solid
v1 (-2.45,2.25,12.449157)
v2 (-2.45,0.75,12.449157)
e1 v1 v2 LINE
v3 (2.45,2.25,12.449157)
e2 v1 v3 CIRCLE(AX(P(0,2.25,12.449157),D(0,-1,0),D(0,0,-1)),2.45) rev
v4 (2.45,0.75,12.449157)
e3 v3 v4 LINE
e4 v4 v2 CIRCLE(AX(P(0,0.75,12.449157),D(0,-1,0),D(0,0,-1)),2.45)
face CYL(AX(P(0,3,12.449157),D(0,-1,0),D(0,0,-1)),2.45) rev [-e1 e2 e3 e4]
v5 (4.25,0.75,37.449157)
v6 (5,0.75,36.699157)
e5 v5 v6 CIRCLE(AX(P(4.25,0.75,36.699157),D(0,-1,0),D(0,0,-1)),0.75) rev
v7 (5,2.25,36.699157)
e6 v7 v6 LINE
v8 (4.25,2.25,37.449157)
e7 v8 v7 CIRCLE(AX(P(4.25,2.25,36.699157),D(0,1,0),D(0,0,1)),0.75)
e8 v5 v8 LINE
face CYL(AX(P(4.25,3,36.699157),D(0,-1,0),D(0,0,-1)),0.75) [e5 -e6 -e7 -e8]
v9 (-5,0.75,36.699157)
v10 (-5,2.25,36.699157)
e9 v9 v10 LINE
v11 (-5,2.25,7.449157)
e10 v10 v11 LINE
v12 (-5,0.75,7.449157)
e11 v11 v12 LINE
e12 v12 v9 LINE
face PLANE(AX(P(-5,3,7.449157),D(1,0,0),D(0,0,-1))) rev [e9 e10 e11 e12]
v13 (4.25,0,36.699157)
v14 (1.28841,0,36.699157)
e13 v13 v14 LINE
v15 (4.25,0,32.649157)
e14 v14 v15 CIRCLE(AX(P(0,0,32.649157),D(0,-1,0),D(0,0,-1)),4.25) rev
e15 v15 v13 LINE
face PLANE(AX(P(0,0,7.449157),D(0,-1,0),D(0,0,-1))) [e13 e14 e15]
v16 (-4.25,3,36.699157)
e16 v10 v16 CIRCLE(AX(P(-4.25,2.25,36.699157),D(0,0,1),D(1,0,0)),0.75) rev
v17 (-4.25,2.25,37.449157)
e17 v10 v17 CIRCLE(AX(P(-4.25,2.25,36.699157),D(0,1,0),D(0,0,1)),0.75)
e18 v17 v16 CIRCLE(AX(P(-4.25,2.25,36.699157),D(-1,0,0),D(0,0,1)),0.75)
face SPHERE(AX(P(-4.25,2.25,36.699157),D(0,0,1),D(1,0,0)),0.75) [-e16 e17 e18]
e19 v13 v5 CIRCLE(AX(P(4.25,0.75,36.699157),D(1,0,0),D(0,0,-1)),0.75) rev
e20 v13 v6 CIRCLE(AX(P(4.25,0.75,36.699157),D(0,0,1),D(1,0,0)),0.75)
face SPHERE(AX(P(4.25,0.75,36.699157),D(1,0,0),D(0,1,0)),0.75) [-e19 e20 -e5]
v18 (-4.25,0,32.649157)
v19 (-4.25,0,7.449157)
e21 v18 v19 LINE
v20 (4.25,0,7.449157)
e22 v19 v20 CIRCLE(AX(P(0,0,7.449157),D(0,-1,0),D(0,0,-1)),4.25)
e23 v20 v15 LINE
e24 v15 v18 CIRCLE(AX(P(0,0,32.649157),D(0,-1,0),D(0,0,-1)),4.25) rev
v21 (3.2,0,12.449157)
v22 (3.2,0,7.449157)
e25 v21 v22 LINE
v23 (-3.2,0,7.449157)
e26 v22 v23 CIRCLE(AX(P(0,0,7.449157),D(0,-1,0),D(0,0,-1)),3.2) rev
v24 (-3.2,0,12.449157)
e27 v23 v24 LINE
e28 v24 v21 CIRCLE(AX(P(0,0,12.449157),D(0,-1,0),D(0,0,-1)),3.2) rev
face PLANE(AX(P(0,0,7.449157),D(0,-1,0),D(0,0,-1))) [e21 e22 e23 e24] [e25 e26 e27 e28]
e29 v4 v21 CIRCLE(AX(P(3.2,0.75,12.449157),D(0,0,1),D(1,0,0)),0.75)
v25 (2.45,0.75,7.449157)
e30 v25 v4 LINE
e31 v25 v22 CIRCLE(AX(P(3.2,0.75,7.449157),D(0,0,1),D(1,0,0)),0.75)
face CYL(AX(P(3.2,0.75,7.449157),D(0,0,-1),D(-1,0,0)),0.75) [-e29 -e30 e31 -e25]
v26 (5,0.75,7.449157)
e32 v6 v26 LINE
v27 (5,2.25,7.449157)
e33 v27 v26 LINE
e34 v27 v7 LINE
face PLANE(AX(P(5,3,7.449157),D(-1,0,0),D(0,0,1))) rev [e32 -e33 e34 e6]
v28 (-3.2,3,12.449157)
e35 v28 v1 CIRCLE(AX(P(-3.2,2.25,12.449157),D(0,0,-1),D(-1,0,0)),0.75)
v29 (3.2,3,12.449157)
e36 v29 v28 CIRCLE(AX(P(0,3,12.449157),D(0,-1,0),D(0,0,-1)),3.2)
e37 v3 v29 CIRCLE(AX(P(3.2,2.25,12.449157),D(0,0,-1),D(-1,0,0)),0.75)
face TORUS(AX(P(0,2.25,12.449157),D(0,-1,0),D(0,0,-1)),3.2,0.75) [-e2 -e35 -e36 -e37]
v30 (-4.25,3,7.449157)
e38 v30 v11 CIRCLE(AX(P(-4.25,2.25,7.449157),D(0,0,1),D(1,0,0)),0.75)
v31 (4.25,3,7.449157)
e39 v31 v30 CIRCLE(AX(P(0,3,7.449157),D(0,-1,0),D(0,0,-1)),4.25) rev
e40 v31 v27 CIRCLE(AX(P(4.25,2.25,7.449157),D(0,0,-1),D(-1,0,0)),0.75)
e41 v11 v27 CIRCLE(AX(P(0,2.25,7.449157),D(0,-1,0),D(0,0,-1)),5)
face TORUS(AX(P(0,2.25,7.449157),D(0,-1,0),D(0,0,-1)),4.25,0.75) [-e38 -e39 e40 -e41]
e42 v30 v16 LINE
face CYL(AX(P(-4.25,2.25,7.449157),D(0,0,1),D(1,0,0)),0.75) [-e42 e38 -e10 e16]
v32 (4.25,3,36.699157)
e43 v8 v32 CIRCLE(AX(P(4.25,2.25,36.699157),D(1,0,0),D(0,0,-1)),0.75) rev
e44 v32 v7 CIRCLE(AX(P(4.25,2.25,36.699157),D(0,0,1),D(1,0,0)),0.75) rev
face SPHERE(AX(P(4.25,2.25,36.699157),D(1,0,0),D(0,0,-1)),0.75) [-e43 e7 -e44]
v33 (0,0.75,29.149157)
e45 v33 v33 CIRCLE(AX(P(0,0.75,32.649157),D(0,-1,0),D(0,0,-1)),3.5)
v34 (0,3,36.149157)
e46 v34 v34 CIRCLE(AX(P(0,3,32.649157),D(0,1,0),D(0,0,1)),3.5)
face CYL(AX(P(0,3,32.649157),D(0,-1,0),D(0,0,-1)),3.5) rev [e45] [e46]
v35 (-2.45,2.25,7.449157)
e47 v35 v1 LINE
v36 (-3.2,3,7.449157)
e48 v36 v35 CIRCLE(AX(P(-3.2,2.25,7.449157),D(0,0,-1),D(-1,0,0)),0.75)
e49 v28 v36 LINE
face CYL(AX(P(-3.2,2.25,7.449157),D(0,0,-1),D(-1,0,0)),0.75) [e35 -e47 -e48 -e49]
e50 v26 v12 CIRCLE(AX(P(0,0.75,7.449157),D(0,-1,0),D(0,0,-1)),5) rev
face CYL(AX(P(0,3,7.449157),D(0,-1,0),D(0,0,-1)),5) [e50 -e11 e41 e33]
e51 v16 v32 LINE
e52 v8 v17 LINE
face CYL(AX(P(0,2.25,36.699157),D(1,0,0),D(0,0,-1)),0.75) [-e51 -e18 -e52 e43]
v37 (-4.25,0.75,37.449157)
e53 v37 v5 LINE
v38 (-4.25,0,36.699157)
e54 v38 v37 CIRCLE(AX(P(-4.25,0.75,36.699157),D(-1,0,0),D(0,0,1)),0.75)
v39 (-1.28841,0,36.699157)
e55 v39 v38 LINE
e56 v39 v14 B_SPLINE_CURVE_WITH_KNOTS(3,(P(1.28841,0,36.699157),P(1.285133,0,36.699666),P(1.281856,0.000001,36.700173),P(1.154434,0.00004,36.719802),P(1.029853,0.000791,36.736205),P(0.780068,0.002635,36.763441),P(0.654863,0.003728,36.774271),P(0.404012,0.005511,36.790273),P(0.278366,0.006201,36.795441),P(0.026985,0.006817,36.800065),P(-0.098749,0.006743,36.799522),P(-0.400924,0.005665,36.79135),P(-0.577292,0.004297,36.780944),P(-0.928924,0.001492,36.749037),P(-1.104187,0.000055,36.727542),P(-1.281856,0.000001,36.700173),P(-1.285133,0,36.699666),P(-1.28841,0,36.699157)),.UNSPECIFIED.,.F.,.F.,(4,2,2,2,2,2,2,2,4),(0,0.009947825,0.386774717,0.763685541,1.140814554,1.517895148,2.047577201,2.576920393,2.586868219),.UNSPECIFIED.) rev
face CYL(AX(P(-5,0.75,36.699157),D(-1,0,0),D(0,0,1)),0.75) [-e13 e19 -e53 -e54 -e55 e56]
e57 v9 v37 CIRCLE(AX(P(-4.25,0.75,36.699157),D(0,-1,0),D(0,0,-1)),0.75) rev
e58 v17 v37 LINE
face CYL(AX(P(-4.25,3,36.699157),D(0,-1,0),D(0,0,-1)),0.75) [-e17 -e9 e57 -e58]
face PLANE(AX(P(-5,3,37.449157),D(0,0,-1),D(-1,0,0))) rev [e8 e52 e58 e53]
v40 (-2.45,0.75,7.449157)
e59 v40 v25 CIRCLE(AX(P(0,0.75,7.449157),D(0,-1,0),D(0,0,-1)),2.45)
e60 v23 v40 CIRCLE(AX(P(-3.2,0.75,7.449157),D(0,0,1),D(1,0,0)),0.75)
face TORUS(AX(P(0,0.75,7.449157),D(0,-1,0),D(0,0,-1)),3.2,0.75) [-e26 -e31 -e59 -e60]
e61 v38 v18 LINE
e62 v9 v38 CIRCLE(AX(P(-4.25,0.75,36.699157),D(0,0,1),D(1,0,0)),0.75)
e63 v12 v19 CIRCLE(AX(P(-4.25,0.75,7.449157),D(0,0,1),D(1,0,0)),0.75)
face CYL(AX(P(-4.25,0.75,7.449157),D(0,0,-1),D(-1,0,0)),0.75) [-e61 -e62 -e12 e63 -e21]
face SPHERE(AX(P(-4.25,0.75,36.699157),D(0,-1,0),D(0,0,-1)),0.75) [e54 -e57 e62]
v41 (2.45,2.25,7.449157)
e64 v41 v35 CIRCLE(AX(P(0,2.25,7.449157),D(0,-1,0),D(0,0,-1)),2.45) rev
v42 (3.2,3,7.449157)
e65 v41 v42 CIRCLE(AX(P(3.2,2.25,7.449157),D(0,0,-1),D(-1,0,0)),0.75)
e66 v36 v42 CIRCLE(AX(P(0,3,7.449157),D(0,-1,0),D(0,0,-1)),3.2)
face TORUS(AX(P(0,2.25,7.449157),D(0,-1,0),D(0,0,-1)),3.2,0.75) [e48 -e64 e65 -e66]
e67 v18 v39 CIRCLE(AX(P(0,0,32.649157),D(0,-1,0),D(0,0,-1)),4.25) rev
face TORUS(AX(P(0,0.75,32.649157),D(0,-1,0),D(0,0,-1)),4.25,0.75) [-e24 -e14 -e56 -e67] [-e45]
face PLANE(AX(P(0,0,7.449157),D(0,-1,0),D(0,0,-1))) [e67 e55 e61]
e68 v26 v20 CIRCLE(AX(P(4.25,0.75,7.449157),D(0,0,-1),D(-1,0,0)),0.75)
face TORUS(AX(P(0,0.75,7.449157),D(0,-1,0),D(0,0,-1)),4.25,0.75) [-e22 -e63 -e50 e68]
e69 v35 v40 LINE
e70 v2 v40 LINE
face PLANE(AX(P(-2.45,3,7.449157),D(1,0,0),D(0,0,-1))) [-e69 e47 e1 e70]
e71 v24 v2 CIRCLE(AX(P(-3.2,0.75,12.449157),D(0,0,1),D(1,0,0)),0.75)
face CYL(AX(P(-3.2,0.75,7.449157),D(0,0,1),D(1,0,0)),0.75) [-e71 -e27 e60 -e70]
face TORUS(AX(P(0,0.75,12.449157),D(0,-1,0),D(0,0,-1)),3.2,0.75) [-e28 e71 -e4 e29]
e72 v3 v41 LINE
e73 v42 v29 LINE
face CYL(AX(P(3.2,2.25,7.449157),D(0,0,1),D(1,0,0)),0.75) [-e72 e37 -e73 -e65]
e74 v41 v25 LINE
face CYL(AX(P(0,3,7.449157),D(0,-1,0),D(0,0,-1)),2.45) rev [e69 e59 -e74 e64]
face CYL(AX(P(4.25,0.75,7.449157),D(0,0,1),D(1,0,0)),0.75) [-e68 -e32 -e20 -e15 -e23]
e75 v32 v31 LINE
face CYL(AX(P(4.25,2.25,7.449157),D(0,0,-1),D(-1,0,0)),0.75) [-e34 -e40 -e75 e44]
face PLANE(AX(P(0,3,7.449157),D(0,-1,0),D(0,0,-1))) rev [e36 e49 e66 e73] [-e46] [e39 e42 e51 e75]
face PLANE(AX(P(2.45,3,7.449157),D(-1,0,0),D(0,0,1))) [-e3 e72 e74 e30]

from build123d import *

# Parameters (mm, degrees)
SKETCH1_R           = 3.5
BOSS_EXTRUDE1_DEPTH = 3
FILLET1_R           = 0.75


with BuildPart() as part:
    # Sketch1 → Boss-Extrude1 (new body)
    with BuildSketch(Plane(origin=(0, 0, 0), x_dir=(1, 0, 0), z_dir=(0, 1, 0))):
        with BuildLine():
            Line((-5, -37.44915748), (5, -37.44915748))
            Line((5, -37.44915748), (5, -7.44915748))
            ThreePointArc((5, -7.44915748), (0, -2.44915748), (-5, -7.44915748))
            Line((-5, -7.44915748), (-5, -37.44915748))
        make_face()
        with Locations(Location((0, -32.64915748, 0), (0, 0, 270))):
            Circle(SKETCH1_R, mode=Mode.SUBTRACT)
        with BuildLine():
            Line((2.45, -7.44915748), (2.45, -12.44915748))
            ThreePointArc((2.45, -12.44915748), (0, -14.89915748), (-2.45, -12.44915748))
            Line((-2.45, -12.44915748), (-2.45, -7.44915748))
            ThreePointArc((-2.45, -7.44915748), (0, -4.99915748), (2.45, -7.44915748))
        make_face(mode=Mode.SUBTRACT)
    extrude(amount=BOSS_EXTRUDE1_DEPTH)

    # Fillet1
    # the kernel refuses this fillet: 0.75 mm, written as the material it takes off along each edge
    with BuildSketch(Plane(origin=(-4.25, 2.25, 36.69915748), x_dir=(0, 0, 1), z_dir=(-1, 0, 0))) as fillet1_piece_1_section:
        Polygon((0, 0), (FILLET1_R, 0), (FILLET1_R, FILLET1_R), (0, FILLET1_R), align=None)
    fillet1_piece_1 = extrude(amount=FILLET1_R, mode=Mode.PRIVATE)
    fillet1_piece_1 = fillet1_piece_1 - Plane(origin=(-4.25, 2.25, 36.69915748), x_dir=(0, -0.7071067811865475, -0.7071067811865475), z_dir=(-1, 0, 0)) * Sphere(FILLET1_R, mode=Mode.PRIVATE)
    add(fillet1_piece_1, mode=Mode.SUBTRACT)
    with BuildSketch(Plane(origin=(4.25, 2.25, 36.69915748), x_dir=(0, 1, 0), z_dir=(0, 0, 1))) as fillet1_piece_2_section:
        Polygon((0, 0), (FILLET1_R, 0), (FILLET1_R, -FILLET1_R), (0, -FILLET1_R), align=None)
    fillet1_piece_2 = extrude(amount=FILLET1_R, mode=Mode.PRIVATE)
    fillet1_piece_2 = fillet1_piece_2 - Plane(origin=(4.25, 2.25, 36.69915748), x_dir=(-0.7071067811865475, -0.7071067811865475, 0), z_dir=(0, 0, 1)) * Sphere(FILLET1_R, mode=Mode.PRIVATE)
    add(fillet1_piece_2, mode=Mode.SUBTRACT)
    with BuildSketch(Plane(origin=(-4.25, 0.75, 36.69915748), x_dir=(0, 0, 1), z_dir=(-1, 0, 0))) as fillet1_piece_3_section:
        Polygon((0, 0), (FILLET1_R, 0), (FILLET1_R, -FILLET1_R), (0, -FILLET1_R), align=None)
    fillet1_piece_3 = extrude(amount=FILLET1_R, mode=Mode.PRIVATE)
    fillet1_piece_3 = fillet1_piece_3 - Plane(origin=(-4.25, 0.75, 36.69915748), x_dir=(0, 0.7071067811865475, -0.7071067811865475), z_dir=(-1, 0, 0)) * Sphere(FILLET1_R, mode=Mode.PRIVATE)
    add(fillet1_piece_3, mode=Mode.SUBTRACT)
    with BuildSketch(Plane(origin=(4.25, 0.75, 36.69915748), x_dir=(1, 0, 0), z_dir=(0, 0, 1))) as fillet1_piece_4_section:
        Polygon((0, 0), (FILLET1_R, 0), (FILLET1_R, -FILLET1_R), (0, -FILLET1_R), align=None)
    fillet1_piece_4 = extrude(amount=FILLET1_R, mode=Mode.PRIVATE)
    fillet1_piece_4 = fillet1_piece_4 - Plane(origin=(4.25, 0.75, 36.69915748), x_dir=(-0.7071067811865475, 0.7071067811865475, 0), z_dir=(0, 0, 1)) * Sphere(FILLET1_R, mode=Mode.PRIVATE)
    add(fillet1_piece_4, mode=Mode.SUBTRACT)
    with BuildSketch(Plane(origin=(-5, 3, 7.44915748), x_dir=(0, -1, 0), z_dir=(0, 0, 1)), Plane(origin=(5, 3, 36.69915748), x_dir=(0, -1, 0), z_dir=(0, 0, -1))) as fillet1_piece_5:
        with BuildLine():
            CenterArc((FILLET1_R, FILLET1_R), FILLET1_R, 180, 90)
            Line((0, FILLET1_R), (0, 0))
            Line((0, 0), (FILLET1_R, 0))
        make_face()
    extrude(amount=29.25, mode=Mode.SUBTRACT)
    with BuildSketch(Plane(origin=(0, 0, 7.44915748), x_dir=(-1, 0, 0), z_dir=(0, 0, 1))) as fillet1_piece_6:
        with BuildLine():
            CenterArc((2.45 + FILLET1_R, -FILLET1_R), FILLET1_R, 90, 90)
            Line((2.45 + FILLET1_R, 0), (2.45, 0))
            Line((2.45, 0), (2.45, -FILLET1_R))
        make_face()
    revolve(axis=Axis((0, 0, 7.44915748), (0, -1, 0)), revolution_arc=180, mode=Mode.SUBTRACT)
    with BuildSketch(Plane(origin=(-2.45, 0, 12.44915748), x_dir=(0, 1, 0), z_dir=(0, 0, -1)), Plane(origin=(2.45, 0, 7.44915748), x_dir=(0, 1, 0), z_dir=(0, 0, 1))) as fillet1_piece_7:
        with BuildLine():
            CenterArc((FILLET1_R, -FILLET1_R), FILLET1_R, 90, 90)
            Line((0, -FILLET1_R), (0, 0))
            Line((0, 0), (FILLET1_R, 0))
        make_face()
    extrude(amount=5, mode=Mode.SUBTRACT)
    with BuildSketch(Plane(origin=(0, 0, 12.44915748), x_dir=(1, 0, 0), z_dir=(0, 0, -1))) as fillet1_piece_8:
        with BuildLine():
            CenterArc((2.45 + FILLET1_R, -FILLET1_R), FILLET1_R, 90, 90)
            Line((2.45 + FILLET1_R, 0), (2.45, 0))
            Line((2.45, 0), (2.45, -FILLET1_R))
        make_face()
    revolve(axis=Axis((0, 0, 12.44915748), (0, -1, 0)), revolution_arc=180, mode=Mode.SUBTRACT)
    with BuildSketch(Plane(origin=(0, 3, 7.44915748), x_dir=(-1, 0, 0), z_dir=(0, 0, 1))) as fillet1_piece_9:
        with BuildLine():
            CenterArc((2.45 + FILLET1_R, FILLET1_R), FILLET1_R, 180, 90)
            Line((2.45 + FILLET1_R, 0), (2.45, 0))
            Line((2.45, 0), (2.45, FILLET1_R))
        make_face()
    revolve(axis=Axis((0, 3, 7.44915748), (0, -1, 0)), revolution_arc=180, mode=Mode.SUBTRACT)
    with BuildSketch(Plane(origin=(-4.25, 3, 37.44915748), x_dir=(0, -1, 0), z_dir=(1, 0, 0))) as fillet1_piece_10:
        with BuildLine():
            CenterArc((FILLET1_R, FILLET1_R), FILLET1_R, 180, 90)
            Line((0, FILLET1_R), (0, 0))
            Line((0, 0), (FILLET1_R, 0))
        make_face()
    extrude(amount=8.5, mode=Mode.SUBTRACT)
    with BuildSketch(Plane(origin=(-2.45, 3, 12.44915748), x_dir=(0, -1, 0), z_dir=(0, 0, -1)), Plane(origin=(2.45, 3, 7.44915748), x_dir=(0, -1, 0), z_dir=(0, 0, 1))) as fillet1_piece_11:
        with BuildLine():
            CenterArc((FILLET1_R, FILLET1_R), FILLET1_R, 180, 90)
            Line((0, FILLET1_R), (0, 0))
            Line((0, 0), (FILLET1_R, 0))
        make_face()
    extrude(amount=5, mode=Mode.SUBTRACT)
    with BuildSketch(Plane(origin=(0, 3, 12.44915748), x_dir=(1, 0, 0), z_dir=(0, 0, -1))) as fillet1_piece_12:
        with BuildLine():
            CenterArc((2.45 + FILLET1_R, FILLET1_R), FILLET1_R, 180, 90)
            Line((2.45 + FILLET1_R, 0), (2.45, 0))
            Line((2.45, 0), (2.45, FILLET1_R))
        make_face()
    revolve(axis=Axis((0, 3, 12.44915748), (0, -1, 0)), revolution_arc=180, mode=Mode.SUBTRACT)
    with BuildSketch(Plane(origin=(0, 0, 32.64915748), x_dir=(0, 0, 1), z_dir=(-1, 0, 0))) as fillet1_piece_13:
        with BuildLine():
            CenterArc((3.5 + FILLET1_R, FILLET1_R), FILLET1_R, 180, 90)
            Line((3.5 + FILLET1_R, 0), (3.5, 0))
            Line((3.5, 0), (3.5, FILLET1_R))
        make_face()
    revolve(axis=Axis((0, 0, 32.64915748), (0, 1, 0)), mode=Mode.SUBTRACT)
    with BuildSketch(Plane(origin=(-4.25, 0, 37.44915748), x_dir=(0, 1, 0), z_dir=(1, 0, 0))) as fillet1_piece_14:
        with BuildLine():
            CenterArc((FILLET1_R, -FILLET1_R), FILLET1_R, 90, 90)
            Line((0, -FILLET1_R), (0, 0))
            Line((0, 0), (FILLET1_R, 0))
        make_face()
    extrude(amount=8.5, mode=Mode.SUBTRACT)
    with BuildSketch(Plane(origin=(-5, 0, 7.44915748), x_dir=(0, 1, 0), z_dir=(0, 0, 1)), Plane(origin=(5, 0, 36.69915748), x_dir=(0, 1, 0), z_dir=(0, 0, -1))) as fillet1_piece_15:
        with BuildLine():
            CenterArc((FILLET1_R, -FILLET1_R), FILLET1_R, 90, 90)
            Line((0, -FILLET1_R), (0, 0))
            Line((0, 0), (FILLET1_R, 0))
        make_face()
    extrude(amount=29.25, mode=Mode.SUBTRACT)
    with BuildSketch(Plane(origin=(0, 0, 7.44915748), x_dir=(1, 0, 0), z_dir=(0, 0, 1))) as fillet1_piece_16:
        with BuildLine():
            CenterArc((5 - FILLET1_R, FILLET1_R), FILLET1_R, 270, 90)
            Line((5 - FILLET1_R, 0), (5, 0))
            Line((5, 0), (5, FILLET1_R))
        make_face()
    revolve(axis=Axis((0, 0, 7.44915748), (0, 1, 0)), revolution_arc=180, mode=Mode.SUBTRACT)
    with BuildSketch(Plane(origin=(5, 0.75, 37.44915748), x_dir=(-1, 0, 0), z_dir=(0, 1, 0)), Plane(origin=(-5, 0.75, 37.44915748), x_dir=(0, 0, -1), z_dir=(0, 1, 0))) as fillet1_piece_17:
        with BuildLine():
            CenterArc((FILLET1_R, -FILLET1_R), FILLET1_R, 90, 90)
            Line((0, -FILLET1_R), (0, 0))
            Line((0, 0), (FILLET1_R, 0))
        make_face()
    extrude(amount=1.5, mode=Mode.SUBTRACT)
    with BuildSketch(Plane(origin=(0, 3, 7.44915748), x_dir=(1, 0, 0), z_dir=(0, 0, 1))) as fillet1_piece_18:
        with BuildLine():
            CenterArc((5 - FILLET1_R, -FILLET1_R), FILLET1_R, 0, 90)
            Line((5 - FILLET1_R, 0), (5, 0))
            Line((5, 0), (5, -FILLET1_R))
        make_face()
    revolve(axis=Axis((0, 3, 7.44915748), (0, 1, 0)), revolution_arc=180, mode=Mode.SUBTRACT)


solid = part.part
